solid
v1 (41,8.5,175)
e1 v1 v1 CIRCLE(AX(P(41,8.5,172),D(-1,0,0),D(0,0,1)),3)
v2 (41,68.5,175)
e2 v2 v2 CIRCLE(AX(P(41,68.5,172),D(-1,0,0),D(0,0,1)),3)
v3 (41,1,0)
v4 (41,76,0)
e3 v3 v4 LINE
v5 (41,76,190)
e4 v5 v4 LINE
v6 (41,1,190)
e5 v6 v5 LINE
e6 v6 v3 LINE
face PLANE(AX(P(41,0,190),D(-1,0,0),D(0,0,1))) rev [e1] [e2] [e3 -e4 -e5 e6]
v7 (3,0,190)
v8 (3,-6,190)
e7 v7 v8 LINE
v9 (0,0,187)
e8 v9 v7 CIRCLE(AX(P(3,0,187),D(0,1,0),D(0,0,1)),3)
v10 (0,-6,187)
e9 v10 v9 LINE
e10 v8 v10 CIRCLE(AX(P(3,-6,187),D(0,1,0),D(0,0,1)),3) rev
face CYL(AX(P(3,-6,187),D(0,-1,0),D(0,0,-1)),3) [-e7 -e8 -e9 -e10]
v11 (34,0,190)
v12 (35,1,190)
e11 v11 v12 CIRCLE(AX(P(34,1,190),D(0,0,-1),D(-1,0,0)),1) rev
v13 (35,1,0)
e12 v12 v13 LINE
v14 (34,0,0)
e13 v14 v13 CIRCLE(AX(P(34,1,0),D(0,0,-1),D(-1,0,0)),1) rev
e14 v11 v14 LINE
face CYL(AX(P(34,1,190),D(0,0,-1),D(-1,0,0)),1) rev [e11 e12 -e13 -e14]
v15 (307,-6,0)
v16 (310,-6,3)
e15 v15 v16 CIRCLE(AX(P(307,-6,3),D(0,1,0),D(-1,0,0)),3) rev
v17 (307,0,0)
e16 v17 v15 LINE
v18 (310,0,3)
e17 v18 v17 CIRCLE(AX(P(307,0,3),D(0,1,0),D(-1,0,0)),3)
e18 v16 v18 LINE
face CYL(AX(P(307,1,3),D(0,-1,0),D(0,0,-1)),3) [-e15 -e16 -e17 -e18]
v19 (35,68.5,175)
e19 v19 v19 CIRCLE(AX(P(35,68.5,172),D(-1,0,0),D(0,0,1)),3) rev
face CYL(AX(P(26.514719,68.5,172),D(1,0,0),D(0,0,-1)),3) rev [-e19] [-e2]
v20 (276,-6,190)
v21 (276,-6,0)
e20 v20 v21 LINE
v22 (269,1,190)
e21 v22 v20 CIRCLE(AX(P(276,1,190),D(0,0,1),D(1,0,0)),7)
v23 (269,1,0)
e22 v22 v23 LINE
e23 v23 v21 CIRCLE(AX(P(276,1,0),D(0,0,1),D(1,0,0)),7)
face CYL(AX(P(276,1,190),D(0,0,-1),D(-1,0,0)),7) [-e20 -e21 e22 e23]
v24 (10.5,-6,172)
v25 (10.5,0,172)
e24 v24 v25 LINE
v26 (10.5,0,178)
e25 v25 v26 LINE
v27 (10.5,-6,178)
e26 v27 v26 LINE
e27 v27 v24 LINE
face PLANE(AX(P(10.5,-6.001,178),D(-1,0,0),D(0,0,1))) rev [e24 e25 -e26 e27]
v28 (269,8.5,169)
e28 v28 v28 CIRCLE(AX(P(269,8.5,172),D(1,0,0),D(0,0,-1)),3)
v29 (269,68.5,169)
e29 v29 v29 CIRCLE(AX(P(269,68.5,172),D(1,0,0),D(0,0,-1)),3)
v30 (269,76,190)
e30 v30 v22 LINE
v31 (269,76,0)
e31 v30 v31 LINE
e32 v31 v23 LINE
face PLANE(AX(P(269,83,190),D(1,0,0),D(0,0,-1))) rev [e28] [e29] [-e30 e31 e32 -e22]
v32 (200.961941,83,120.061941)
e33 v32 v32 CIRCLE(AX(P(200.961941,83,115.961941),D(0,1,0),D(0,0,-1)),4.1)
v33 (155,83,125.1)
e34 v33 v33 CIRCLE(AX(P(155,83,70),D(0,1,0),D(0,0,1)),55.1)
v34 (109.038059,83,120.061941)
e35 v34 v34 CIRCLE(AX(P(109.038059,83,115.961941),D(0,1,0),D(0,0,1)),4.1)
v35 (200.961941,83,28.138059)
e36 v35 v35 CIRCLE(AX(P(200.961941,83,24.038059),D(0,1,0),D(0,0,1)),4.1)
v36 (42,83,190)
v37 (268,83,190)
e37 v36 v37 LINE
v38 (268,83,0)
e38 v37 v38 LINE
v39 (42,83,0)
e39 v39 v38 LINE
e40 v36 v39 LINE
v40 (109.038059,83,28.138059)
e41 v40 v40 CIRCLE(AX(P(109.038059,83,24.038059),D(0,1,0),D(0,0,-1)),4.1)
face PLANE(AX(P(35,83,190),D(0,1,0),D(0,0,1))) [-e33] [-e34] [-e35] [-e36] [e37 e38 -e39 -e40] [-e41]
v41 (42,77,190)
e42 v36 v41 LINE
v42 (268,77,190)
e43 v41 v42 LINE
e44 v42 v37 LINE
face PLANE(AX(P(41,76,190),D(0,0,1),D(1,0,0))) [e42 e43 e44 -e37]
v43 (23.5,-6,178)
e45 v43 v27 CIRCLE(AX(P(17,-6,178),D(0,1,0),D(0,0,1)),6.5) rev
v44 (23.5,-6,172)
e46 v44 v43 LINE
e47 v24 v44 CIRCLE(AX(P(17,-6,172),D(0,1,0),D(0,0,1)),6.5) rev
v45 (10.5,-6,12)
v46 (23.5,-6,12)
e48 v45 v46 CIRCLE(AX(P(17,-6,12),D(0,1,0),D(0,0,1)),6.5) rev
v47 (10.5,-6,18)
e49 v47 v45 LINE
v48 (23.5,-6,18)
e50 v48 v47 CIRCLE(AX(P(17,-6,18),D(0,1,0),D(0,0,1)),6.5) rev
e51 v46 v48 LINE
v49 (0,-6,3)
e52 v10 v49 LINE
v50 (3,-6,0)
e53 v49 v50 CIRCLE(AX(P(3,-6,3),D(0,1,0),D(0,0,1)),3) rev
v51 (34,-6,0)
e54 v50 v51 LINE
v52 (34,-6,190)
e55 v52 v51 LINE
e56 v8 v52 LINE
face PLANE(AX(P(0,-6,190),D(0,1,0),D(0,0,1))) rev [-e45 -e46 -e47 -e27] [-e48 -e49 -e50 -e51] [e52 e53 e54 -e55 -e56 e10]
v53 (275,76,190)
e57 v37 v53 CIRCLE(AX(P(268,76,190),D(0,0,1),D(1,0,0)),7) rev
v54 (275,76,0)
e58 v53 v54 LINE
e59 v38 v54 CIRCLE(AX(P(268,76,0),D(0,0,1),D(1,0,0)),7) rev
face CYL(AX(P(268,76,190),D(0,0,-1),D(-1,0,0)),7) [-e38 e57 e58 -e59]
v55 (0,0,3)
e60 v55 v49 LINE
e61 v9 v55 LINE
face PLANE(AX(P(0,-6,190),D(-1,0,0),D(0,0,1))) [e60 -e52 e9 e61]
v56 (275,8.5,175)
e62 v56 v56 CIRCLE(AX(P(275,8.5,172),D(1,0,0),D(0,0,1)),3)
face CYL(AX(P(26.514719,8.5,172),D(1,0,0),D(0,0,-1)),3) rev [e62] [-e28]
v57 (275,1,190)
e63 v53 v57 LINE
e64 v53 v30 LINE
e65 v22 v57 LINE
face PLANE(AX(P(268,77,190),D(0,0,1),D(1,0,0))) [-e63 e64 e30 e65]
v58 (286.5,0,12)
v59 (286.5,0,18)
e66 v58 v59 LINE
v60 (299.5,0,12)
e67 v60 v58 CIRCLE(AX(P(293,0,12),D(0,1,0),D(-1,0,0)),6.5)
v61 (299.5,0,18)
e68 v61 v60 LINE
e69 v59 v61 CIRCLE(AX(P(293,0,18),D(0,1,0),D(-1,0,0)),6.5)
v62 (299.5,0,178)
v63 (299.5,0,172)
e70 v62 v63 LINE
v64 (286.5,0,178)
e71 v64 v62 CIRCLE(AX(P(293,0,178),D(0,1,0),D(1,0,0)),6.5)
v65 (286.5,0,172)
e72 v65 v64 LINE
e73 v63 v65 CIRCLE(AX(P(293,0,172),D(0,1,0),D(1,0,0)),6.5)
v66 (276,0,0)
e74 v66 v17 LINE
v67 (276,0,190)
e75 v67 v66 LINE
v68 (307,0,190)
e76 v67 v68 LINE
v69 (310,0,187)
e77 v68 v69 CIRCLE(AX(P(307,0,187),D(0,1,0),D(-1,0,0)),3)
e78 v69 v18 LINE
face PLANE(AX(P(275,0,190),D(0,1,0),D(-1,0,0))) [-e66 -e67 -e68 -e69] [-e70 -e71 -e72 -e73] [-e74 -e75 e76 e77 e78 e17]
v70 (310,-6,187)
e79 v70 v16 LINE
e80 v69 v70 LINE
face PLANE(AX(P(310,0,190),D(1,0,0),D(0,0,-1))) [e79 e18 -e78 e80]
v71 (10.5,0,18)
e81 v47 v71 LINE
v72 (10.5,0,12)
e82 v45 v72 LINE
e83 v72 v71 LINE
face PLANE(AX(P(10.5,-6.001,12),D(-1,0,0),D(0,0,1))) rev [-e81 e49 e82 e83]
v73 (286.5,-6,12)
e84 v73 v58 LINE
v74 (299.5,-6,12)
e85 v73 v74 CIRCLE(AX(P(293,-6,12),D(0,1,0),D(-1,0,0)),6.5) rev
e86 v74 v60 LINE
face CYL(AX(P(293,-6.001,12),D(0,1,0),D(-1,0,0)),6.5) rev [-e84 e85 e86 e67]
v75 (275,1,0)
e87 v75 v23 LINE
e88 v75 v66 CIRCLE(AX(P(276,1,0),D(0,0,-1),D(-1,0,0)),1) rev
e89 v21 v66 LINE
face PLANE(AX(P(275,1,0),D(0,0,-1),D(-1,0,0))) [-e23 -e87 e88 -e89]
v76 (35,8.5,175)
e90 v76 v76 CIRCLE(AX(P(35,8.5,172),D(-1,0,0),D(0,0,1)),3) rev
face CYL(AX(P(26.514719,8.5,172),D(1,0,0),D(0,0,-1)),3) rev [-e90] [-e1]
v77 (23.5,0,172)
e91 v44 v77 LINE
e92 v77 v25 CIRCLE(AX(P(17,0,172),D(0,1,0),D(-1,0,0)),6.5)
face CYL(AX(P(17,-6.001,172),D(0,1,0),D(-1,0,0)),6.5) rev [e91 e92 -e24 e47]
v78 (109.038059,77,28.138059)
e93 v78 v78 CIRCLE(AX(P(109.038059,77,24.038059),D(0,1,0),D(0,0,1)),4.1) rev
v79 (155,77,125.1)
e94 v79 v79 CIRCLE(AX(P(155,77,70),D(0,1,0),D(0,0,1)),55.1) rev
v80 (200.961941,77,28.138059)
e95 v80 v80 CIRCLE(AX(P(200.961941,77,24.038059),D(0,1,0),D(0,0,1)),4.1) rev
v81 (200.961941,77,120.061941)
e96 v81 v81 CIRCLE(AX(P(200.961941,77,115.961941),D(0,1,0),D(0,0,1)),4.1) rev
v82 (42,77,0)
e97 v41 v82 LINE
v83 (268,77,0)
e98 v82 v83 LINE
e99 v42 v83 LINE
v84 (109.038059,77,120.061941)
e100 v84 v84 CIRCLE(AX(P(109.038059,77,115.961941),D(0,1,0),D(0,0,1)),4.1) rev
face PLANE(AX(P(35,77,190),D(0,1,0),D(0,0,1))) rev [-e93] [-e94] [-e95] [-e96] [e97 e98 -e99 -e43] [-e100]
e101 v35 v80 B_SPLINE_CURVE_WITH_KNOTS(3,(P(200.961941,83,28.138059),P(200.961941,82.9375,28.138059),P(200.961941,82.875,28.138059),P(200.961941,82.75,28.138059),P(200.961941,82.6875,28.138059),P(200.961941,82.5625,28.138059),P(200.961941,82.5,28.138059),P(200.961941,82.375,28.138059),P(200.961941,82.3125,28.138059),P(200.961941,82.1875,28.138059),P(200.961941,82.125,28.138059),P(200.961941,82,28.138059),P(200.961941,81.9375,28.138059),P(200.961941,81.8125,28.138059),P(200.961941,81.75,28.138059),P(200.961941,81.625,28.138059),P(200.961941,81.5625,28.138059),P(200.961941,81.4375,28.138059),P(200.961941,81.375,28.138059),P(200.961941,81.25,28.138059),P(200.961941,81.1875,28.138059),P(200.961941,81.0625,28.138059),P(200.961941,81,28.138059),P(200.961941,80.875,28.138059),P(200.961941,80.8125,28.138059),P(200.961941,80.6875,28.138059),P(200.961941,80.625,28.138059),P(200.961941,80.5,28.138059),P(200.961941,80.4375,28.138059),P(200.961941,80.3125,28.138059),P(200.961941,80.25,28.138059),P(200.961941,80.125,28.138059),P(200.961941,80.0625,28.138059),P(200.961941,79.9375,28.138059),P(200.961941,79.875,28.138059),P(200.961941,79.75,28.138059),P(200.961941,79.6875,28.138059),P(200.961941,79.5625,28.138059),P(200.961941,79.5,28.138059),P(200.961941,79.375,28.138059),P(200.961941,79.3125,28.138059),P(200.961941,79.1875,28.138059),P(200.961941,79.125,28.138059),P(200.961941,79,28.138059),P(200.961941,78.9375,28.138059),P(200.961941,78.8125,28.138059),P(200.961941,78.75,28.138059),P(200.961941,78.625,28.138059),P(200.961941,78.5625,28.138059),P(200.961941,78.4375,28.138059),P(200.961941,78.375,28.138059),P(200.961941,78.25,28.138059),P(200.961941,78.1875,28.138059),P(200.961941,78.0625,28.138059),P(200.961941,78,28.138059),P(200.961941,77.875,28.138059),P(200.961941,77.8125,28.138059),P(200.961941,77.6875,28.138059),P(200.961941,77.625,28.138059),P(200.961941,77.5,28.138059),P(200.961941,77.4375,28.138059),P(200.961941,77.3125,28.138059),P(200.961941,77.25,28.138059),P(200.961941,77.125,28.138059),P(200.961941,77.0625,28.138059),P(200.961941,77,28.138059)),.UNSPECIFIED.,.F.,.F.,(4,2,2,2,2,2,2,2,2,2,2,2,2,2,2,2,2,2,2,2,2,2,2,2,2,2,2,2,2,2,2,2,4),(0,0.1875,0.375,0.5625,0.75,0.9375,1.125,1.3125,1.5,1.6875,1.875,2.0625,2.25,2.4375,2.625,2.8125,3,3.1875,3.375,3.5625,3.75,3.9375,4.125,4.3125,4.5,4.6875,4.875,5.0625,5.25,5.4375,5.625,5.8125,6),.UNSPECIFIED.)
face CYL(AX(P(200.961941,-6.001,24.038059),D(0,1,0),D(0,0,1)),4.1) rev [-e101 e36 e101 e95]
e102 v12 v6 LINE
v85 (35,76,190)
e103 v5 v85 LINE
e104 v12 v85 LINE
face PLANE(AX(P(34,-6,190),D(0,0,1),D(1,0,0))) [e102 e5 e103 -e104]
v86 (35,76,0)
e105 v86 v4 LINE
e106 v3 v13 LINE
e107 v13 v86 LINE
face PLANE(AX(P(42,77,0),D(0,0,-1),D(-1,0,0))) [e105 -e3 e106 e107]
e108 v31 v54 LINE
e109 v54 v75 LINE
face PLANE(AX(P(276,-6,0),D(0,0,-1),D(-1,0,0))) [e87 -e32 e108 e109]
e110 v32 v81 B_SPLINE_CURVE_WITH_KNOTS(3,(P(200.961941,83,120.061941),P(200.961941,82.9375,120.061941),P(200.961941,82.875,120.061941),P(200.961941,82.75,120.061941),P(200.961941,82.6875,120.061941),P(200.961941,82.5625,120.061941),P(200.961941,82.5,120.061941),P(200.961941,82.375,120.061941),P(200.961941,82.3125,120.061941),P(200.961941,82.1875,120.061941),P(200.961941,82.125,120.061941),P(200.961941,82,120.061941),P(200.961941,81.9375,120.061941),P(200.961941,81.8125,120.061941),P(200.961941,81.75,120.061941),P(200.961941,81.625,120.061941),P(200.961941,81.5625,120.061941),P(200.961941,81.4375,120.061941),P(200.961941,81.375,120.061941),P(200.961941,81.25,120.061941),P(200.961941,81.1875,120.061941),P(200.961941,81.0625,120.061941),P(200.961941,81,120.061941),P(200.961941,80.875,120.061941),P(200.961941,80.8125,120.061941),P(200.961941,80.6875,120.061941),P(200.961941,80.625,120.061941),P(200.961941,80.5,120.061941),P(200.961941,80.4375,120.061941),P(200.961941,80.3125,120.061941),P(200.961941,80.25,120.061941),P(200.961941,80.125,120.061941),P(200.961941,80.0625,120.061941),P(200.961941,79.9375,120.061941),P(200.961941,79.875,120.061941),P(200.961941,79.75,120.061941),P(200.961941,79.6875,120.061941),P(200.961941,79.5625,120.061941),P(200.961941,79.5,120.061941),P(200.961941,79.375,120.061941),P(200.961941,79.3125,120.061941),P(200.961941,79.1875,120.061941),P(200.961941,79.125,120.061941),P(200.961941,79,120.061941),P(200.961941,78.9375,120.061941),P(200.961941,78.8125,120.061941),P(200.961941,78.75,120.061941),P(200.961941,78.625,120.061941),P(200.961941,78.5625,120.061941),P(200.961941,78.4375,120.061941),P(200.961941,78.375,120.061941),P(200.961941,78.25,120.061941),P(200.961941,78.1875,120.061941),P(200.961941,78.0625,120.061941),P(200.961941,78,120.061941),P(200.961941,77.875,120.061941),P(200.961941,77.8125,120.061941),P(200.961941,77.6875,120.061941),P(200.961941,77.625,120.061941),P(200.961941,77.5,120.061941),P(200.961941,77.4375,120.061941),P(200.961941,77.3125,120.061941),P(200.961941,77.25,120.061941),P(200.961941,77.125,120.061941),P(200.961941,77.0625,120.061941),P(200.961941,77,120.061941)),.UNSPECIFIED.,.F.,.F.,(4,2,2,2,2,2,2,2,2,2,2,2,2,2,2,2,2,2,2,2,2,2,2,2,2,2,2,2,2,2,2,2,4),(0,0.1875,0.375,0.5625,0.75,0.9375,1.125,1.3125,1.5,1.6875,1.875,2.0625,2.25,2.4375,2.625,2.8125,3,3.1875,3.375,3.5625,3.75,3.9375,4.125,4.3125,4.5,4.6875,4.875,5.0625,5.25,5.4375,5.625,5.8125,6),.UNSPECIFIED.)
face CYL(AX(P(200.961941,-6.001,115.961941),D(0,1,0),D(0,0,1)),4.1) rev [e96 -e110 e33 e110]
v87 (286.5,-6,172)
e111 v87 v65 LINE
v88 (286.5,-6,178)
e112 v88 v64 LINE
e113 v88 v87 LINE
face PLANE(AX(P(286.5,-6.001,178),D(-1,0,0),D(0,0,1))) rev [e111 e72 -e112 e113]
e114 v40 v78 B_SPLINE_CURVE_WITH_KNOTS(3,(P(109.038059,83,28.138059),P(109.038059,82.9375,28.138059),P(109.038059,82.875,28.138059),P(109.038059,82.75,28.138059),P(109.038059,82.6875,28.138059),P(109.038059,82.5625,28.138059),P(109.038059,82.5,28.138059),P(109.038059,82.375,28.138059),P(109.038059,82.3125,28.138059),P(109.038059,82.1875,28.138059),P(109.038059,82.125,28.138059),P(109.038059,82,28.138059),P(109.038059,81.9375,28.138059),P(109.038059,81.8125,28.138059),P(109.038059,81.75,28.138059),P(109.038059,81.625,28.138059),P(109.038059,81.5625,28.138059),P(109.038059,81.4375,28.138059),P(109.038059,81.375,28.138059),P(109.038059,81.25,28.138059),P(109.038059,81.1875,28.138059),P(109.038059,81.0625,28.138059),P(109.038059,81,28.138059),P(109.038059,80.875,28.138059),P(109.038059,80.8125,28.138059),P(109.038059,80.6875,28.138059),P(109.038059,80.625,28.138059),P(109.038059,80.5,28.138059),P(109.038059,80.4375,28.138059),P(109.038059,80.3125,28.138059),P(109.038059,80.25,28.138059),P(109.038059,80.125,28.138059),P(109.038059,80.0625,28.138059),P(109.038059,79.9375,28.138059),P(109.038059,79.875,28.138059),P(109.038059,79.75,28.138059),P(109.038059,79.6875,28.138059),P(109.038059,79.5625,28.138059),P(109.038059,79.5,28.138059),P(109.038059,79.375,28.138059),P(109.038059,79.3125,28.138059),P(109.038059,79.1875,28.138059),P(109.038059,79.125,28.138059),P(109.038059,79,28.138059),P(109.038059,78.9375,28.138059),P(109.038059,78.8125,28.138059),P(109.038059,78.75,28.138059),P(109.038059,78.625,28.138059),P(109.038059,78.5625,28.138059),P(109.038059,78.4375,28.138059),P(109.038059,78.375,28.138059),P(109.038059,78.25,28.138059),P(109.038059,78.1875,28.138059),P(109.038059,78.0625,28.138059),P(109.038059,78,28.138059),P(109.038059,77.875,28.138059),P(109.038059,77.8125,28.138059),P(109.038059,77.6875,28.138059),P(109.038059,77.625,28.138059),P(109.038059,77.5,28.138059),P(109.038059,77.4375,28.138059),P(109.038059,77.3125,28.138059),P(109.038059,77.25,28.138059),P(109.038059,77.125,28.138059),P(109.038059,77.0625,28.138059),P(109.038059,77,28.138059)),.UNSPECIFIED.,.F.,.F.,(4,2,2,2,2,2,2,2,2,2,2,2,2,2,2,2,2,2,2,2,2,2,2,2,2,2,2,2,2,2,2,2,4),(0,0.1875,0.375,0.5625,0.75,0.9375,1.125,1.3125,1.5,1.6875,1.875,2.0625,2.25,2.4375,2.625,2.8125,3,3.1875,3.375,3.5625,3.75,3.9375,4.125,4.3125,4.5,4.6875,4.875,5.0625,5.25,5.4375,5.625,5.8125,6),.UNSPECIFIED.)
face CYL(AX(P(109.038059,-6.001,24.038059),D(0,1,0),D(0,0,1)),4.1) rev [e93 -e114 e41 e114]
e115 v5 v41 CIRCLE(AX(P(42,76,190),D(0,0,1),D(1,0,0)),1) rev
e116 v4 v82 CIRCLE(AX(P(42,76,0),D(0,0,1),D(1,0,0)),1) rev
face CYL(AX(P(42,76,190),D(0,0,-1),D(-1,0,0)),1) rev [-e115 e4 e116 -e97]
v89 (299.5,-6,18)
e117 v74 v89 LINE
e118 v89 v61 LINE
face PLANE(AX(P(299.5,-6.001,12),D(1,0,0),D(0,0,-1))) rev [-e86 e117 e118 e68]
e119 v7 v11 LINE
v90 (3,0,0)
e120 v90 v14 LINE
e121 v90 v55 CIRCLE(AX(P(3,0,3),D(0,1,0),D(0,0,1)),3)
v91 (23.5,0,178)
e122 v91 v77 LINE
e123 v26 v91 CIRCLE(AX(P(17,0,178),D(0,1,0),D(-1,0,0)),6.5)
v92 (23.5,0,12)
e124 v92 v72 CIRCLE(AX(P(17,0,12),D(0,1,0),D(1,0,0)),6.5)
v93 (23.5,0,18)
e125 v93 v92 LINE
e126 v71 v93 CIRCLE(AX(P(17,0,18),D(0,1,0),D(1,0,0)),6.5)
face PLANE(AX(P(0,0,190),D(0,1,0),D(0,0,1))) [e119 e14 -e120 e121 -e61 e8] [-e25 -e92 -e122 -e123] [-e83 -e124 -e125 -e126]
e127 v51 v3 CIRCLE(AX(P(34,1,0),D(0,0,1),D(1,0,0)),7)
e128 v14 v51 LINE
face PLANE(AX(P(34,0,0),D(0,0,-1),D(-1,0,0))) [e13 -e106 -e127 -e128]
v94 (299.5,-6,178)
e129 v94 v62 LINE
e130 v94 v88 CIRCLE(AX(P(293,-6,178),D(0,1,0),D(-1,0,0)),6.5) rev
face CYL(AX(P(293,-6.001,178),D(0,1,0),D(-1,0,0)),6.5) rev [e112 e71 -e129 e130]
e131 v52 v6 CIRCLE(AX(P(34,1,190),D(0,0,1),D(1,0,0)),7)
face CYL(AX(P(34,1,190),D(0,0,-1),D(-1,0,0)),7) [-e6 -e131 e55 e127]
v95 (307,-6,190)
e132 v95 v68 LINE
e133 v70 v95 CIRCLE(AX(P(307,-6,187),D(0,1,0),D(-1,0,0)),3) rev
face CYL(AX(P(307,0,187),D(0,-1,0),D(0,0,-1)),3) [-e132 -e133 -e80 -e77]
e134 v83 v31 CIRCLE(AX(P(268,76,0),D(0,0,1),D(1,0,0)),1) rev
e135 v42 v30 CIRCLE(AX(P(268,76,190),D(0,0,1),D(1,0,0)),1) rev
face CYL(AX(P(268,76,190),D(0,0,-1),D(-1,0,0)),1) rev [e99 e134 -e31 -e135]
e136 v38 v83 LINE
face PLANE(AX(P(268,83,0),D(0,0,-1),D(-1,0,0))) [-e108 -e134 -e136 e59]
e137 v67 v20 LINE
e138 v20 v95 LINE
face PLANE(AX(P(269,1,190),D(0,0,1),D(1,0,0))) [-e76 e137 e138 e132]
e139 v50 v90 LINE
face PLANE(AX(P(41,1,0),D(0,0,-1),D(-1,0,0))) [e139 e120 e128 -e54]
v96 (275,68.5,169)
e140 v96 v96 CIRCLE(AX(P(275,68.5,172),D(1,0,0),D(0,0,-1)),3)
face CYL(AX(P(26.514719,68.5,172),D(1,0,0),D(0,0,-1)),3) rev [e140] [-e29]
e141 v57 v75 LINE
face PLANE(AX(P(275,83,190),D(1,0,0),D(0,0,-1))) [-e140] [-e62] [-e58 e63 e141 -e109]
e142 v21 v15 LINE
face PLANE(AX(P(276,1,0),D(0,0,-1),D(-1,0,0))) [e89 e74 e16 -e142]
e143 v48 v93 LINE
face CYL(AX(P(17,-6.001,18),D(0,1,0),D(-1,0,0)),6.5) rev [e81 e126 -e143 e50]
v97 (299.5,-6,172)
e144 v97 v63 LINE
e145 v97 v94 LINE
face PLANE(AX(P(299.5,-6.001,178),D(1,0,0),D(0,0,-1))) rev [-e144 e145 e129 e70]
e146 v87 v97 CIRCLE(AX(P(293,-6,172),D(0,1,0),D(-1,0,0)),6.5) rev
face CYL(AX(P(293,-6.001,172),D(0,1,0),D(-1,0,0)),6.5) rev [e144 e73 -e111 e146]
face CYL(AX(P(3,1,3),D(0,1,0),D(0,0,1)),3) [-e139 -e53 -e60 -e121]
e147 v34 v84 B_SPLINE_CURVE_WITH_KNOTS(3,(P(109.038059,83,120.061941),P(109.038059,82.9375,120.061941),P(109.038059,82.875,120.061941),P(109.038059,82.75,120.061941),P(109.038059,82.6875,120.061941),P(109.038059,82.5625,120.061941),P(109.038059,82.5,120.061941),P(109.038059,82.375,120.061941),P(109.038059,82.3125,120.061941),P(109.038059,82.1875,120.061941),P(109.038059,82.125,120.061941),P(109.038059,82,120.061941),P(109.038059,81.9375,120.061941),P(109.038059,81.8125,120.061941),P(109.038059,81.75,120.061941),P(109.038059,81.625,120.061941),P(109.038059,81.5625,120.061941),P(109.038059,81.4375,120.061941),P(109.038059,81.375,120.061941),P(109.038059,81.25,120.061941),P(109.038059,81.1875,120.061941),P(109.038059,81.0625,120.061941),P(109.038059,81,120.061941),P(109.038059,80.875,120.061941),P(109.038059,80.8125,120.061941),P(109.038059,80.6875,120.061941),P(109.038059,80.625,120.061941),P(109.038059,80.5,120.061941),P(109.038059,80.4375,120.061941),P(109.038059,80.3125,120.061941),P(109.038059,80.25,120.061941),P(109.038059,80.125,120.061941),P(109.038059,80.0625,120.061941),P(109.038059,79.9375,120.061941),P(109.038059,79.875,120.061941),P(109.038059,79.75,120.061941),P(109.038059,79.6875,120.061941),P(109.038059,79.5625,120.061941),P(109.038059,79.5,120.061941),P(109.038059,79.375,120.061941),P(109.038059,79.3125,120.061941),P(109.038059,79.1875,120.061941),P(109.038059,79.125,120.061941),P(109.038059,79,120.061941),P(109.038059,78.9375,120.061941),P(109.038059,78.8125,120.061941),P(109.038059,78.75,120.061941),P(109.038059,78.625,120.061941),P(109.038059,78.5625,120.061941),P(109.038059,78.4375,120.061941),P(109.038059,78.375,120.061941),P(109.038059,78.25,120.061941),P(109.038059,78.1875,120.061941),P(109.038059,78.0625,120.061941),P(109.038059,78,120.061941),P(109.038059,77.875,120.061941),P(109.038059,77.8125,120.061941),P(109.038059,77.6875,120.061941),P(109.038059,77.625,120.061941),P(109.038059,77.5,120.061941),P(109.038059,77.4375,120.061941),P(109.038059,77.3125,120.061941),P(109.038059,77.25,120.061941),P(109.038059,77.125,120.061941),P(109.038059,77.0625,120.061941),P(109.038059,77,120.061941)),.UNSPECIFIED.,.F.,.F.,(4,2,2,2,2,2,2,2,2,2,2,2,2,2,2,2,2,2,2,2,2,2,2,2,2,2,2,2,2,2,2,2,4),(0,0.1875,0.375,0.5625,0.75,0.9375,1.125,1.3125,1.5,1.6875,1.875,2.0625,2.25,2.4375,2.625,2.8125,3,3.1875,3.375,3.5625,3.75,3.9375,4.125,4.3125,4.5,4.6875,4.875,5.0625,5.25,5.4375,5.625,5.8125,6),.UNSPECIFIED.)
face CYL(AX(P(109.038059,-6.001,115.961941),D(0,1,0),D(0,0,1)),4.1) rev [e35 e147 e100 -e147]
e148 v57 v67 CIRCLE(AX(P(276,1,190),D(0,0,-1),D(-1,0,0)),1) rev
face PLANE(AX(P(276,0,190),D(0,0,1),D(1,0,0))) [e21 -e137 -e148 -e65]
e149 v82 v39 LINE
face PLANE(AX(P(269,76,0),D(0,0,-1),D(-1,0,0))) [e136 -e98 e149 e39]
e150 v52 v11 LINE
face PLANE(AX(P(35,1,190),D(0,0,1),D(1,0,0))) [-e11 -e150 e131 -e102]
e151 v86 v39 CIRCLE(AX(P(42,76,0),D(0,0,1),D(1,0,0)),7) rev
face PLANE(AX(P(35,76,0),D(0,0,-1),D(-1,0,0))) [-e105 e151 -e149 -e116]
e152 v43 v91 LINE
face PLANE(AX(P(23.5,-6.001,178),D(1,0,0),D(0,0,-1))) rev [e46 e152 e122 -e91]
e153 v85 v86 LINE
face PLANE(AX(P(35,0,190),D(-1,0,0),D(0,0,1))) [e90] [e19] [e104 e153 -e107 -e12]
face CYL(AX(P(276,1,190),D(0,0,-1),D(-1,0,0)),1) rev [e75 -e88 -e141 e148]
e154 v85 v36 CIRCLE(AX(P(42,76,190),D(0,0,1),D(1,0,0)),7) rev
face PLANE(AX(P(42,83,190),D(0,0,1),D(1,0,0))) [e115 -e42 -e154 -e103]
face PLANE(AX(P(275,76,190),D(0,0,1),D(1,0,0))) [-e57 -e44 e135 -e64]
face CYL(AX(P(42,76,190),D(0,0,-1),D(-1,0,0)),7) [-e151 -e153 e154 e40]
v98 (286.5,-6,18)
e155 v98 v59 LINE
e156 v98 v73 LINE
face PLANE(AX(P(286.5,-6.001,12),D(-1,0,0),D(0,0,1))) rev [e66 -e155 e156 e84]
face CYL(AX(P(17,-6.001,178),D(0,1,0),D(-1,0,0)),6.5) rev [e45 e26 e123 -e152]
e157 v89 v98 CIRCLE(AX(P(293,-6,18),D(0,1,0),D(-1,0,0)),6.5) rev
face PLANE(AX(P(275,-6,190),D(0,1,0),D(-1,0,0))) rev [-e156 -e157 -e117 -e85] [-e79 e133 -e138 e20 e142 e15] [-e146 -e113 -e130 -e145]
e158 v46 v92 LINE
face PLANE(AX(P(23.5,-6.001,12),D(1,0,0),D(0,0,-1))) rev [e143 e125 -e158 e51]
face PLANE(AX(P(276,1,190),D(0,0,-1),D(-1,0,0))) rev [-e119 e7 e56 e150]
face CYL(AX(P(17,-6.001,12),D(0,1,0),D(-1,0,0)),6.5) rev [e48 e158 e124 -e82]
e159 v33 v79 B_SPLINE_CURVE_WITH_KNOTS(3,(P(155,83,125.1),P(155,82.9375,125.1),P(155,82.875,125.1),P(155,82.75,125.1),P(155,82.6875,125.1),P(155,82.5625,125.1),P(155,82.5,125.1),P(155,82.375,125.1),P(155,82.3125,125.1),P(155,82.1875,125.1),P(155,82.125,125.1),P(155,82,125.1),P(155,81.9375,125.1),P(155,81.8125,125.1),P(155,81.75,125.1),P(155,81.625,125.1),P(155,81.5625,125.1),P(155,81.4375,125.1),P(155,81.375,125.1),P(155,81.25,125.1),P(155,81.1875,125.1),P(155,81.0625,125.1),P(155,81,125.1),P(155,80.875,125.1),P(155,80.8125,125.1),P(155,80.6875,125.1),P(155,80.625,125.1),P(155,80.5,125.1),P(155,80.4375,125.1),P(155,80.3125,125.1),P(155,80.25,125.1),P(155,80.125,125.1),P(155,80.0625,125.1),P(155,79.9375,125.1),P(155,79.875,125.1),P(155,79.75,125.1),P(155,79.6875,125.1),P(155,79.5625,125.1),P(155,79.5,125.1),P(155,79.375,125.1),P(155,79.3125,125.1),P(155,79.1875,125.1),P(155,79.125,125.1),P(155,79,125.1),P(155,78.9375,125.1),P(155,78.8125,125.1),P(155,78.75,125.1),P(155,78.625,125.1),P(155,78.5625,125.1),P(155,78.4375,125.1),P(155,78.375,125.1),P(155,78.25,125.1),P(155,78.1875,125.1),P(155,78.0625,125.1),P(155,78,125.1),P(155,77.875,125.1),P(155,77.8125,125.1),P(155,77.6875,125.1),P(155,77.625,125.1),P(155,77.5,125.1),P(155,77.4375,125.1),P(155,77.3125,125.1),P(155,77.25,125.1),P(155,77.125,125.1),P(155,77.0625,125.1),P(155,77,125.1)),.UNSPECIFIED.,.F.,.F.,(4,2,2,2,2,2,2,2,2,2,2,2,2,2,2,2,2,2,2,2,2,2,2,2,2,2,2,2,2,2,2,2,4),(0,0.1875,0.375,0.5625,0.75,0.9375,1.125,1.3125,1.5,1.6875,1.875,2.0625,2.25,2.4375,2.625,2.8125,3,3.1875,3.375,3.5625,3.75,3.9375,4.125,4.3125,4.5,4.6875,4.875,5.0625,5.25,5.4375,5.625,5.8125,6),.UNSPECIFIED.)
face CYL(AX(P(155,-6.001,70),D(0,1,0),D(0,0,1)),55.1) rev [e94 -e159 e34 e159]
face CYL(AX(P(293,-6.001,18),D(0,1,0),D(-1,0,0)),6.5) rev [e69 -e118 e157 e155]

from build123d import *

# Parameters (mm, degrees)
BASE_FLANGE1_DEPTH = 190
CUT_EXTRUDE1_REACH = 376.327
SKETCH6_R          = 55.1
SKETCH6_R_2        = 4.1
CUT_EXTRUDE2_REACH = 374.946
FILLET1_R          = 3
CUT_EXTRUDE3_REACH = 346.404
SKETCH8_R          = 3


# Sheet-metal steps are written as plain solids
with BuildPart() as part:
    # Sketch1 → Base-Flange1 (new body)
    with BuildSketch(Plane.XY):
        with BuildLine():
            Line((0, 0), (34, 0))
            ThreePointArc((34, 0), (34.707106781, 0.292893219), (35, 1))
            Line((35, 1), (35, 76))
            ThreePointArc((35, 76), (37.050252532, 80.949747468), (42, 83))
            Line((42, 83), (268, 83))
            ThreePointArc((268, 83), (272.949747468, 80.949747468), (275, 76))
            Line((275, 76), (275, 1))
            ThreePointArc((275, 1), (275.292893219, 0.292893219), (276, 0))
            Line((276, 0), (310, 0))
            Line((310, 0), (310, -6))
            Line((310, -6), (276, -6))
            ThreePointArc((276, -6), (271.050252532, -3.949747468), (269, 1))
            Line((269, 1), (269, 76))
            ThreePointArc((269, 76), (268.707106781, 76.707106781), (268, 77))
            Line((268, 77), (42, 77))
            ThreePointArc((42, 77), (41.292893219, 76.707106781), (41, 76))
            Line((41, 76), (41, 1))
            ThreePointArc((41, 1), (38.949747468, -3.949747468), (34, -6))
            Line((34, -6), (0, -6))
            Line((0, -6), (0, 0))
        make_face()
    extrude(amount=BASE_FLANGE1_DEPTH)

    # Sketch6 → Cut-Extrude1 (cut, up to next)
    with BuildSketch(Plane(origin=(0, 83, 0), x_dir=(1, 0, 0), z_dir=(0, 1, 0)), mode=Mode.PRIVATE) as cut_extrude1_sk1:
        with Locations(Location((155, -70, 0), (0, 0, 270))):
            Circle(SKETCH6_R)
    cut_extrude1_tool1 = extrude(cut_extrude1_sk1.sketch, amount=-CUT_EXTRUDE1_REACH, mode=Mode.PRIVATE) & part.part
    # Sketch6 → Cut-Extrude1 (cut, up to next)
    with BuildSketch(Plane(origin=(0, 83, 0), x_dir=(1, 0, 0), z_dir=(0, 1, 0)), mode=Mode.PRIVATE) as cut_extrude1_sk2:
        with Locations(Location((200.961940777, -24.038059223, 0), (0, 0, 270))):
            Circle(SKETCH6_R_2)
    cut_extrude1_tool2 = extrude(cut_extrude1_sk2.sketch, amount=-CUT_EXTRUDE1_REACH, mode=Mode.PRIVATE) & part.part
    # Sketch6 → Cut-Extrude1 (cut, up to next)
    with BuildSketch(Plane(origin=(0, 83, 0), x_dir=(1, 0, 0), z_dir=(0, 1, 0)), mode=Mode.PRIVATE) as cut_extrude1_sk3:
        with Locations(Location((200.961940777, -115.961940777, 0), (0, 0, 270))):
            Circle(SKETCH6_R_2)
    cut_extrude1_tool3 = extrude(cut_extrude1_sk3.sketch, amount=-CUT_EXTRUDE1_REACH, mode=Mode.PRIVATE) & part.part
    # Sketch6 → Cut-Extrude1 (cut, up to next)
    with BuildSketch(Plane(origin=(0, 83, 0), x_dir=(1, 0, 0), z_dir=(0, 1, 0)), mode=Mode.PRIVATE) as cut_extrude1_sk4:
        with Locations(Location((109.038059223, -24.038059223, 0), (0, 0, 270))):
            Circle(SKETCH6_R_2)
    cut_extrude1_tool4 = extrude(cut_extrude1_sk4.sketch, amount=-CUT_EXTRUDE1_REACH, mode=Mode.PRIVATE) & part.part
    # Sketch6 → Cut-Extrude1 (cut, up to next)
    with BuildSketch(Plane(origin=(0, 83, 0), x_dir=(1, 0, 0), z_dir=(0, 1, 0)), mode=Mode.PRIVATE) as cut_extrude1_sk5:
        with Locations(Location((109.038059223, -115.961940777, 0), (0, 0, 270))):
            Circle(SKETCH6_R_2)
    cut_extrude1_tool5 = extrude(cut_extrude1_sk5.sketch, amount=-CUT_EXTRUDE1_REACH, mode=Mode.PRIVATE) & part.part
    add(cut_extrude1_tool1.solids().sort_by_distance((155, 83, 70))[0], mode=Mode.SUBTRACT)
    add(cut_extrude1_tool2.solids().sort_by_distance((200.961941, 83, 24.038059))[0], mode=Mode.SUBTRACT)
    add(cut_extrude1_tool3.solids().sort_by_distance((200.961941, 83, 115.961941))[0], mode=Mode.SUBTRACT)
    add(cut_extrude1_tool4.solids().sort_by_distance((109.038059, 83, 24.038059))[0], mode=Mode.SUBTRACT)
    add(cut_extrude1_tool5.solids().sort_by_distance((109.038059, 83, 115.961941))[0], mode=Mode.SUBTRACT)

    # Sketch7 → Cut-Extrude2 (cut, up to next)
    with BuildSketch(Plane(origin=(0, 0, 0), x_dir=(1, 0, 0), z_dir=(0, 1, 0)), mode=Mode.PRIVATE) as cut_extrude2_sk1:
        with BuildLine():
            Line((299.5, -12), (299.5, -18))
            ThreePointArc((299.5, -18), (293, -24.5), (286.5, -18))
            Line((286.5, -18), (286.5, -12))
            ThreePointArc((286.5, -12), (293, -5.5), (299.5, -12))
        make_face()
    cut_extrude2_tool1 = extrude(cut_extrude2_sk1.sketch, amount=-CUT_EXTRUDE2_REACH, mode=Mode.PRIVATE) & part.part
    # Sketch7 → Cut-Extrude2 (cut, up to next)
    with BuildSketch(Plane(origin=(0, 0, 0), x_dir=(1, 0, 0), z_dir=(0, 1, 0)), mode=Mode.PRIVATE) as cut_extrude2_sk2:
        with BuildLine():
            Line((299.5, -178), (299.5, -172))
            ThreePointArc((299.5, -172), (293, -165.5), (286.5, -172))
            Line((286.5, -172), (286.5, -178))
            ThreePointArc((286.5, -178), (293, -184.5), (299.5, -178))
        make_face()
    cut_extrude2_tool2 = extrude(cut_extrude2_sk2.sketch, amount=-CUT_EXTRUDE2_REACH, mode=Mode.PRIVATE) & part.part
    # Sketch7 → Cut-Extrude2 (cut, up to next)
    with BuildSketch(Plane(origin=(0, 0, 0), x_dir=(1, 0, 0), z_dir=(0, 1, 0)), mode=Mode.PRIVATE) as cut_extrude2_sk3:
        with BuildLine():
            Line((10.5, -178), (10.5, -172))
            ThreePointArc((10.5, -172), (17, -165.5), (23.5, -172))
            Line((23.5, -172), (23.5, -178))
            ThreePointArc((23.5, -178), (17, -184.5), (10.5, -178))
        make_face()
    cut_extrude2_tool3 = extrude(cut_extrude2_sk3.sketch, amount=-CUT_EXTRUDE2_REACH, mode=Mode.PRIVATE) & part.part
    # Sketch7 → Cut-Extrude2 (cut, up to next)
    with BuildSketch(Plane(origin=(0, 0, 0), x_dir=(1, 0, 0), z_dir=(0, 1, 0)), mode=Mode.PRIVATE) as cut_extrude2_sk4:
        with BuildLine():
            Line((10.5, -12), (10.5, -18))
            ThreePointArc((10.5, -18), (17, -24.5), (23.5, -18))
            Line((23.5, -18), (23.5, -12))
            ThreePointArc((23.5, -12), (17, -5.5), (10.5, -12))
        make_face()
    cut_extrude2_tool4 = extrude(cut_extrude2_sk4.sketch, amount=-CUT_EXTRUDE2_REACH, mode=Mode.PRIVATE) & part.part
    add(cut_extrude2_tool1.solids().sort_by_distance((293, 0, 15))[0], mode=Mode.SUBTRACT)
    add(cut_extrude2_tool2.solids().sort_by_distance((293, 0, 175))[0], mode=Mode.SUBTRACT)
    add(cut_extrude2_tool3.solids().sort_by_distance((17, 0, 175))[0], mode=Mode.SUBTRACT)
    add(cut_extrude2_tool4.solids().sort_by_distance((17, 0, 15))[0], mode=Mode.SUBTRACT)

    # Fillet1
    fillet1_edges = [part.edges().sort_by_distance(p)[0] for p in [
        (0, -3, 0),
        (310, -3, 0),
        (0, -3, 190),
        (310, -3, 190),
    ]]
    fillet(fillet1_edges, radius=FILLET1_R)

    # Cut-Extrude3: up to this face of the body (flat: up to its plane)
    cut_extrude3_end = Plane(part.part.faces().sort_by_distance((35, 38.5, 95))[0])
    # Sketch8 → Cut-Extrude3 (cut, up to the picked face)
    with BuildSketch(Plane(origin=(275, 0, 0), x_dir=(0, 0, -1), z_dir=(1, 0, 0)), mode=Mode.PRIVATE) as cut_extrude3_sk1:
        with Locations((-172, 68.5)):
            Circle(SKETCH8_R)
    cut_extrude3_tool1 = split(extrude(cut_extrude3_sk1.sketch, amount=-CUT_EXTRUDE3_REACH, mode=Mode.PRIVATE), bisect_by=cut_extrude3_end, keep=Keep.BOTH, mode=Mode.PRIVATE)
    # Sketch8 → Cut-Extrude3 (cut, up to the picked face)
    with BuildSketch(Plane(origin=(275, 0, 0), x_dir=(0, 0, -1), z_dir=(1, 0, 0)), mode=Mode.PRIVATE) as cut_extrude3_sk2:
        with Locations((-172, 8.5)):
            Circle(SKETCH8_R)
    cut_extrude3_tool2 = split(extrude(cut_extrude3_sk2.sketch, amount=-CUT_EXTRUDE3_REACH, mode=Mode.PRIVATE), bisect_by=cut_extrude3_end, keep=Keep.BOTH, mode=Mode.PRIVATE)
    add(cut_extrude3_tool1.solids().sort_by(Axis((275, 68.5, 172), (-1, 0, 0)))[0], mode=Mode.SUBTRACT)
    add(cut_extrude3_tool2.solids().sort_by(Axis((275, 8.5, 172), (-1, 0, 0)))[0], mode=Mode.SUBTRACT)


solid = part.part
